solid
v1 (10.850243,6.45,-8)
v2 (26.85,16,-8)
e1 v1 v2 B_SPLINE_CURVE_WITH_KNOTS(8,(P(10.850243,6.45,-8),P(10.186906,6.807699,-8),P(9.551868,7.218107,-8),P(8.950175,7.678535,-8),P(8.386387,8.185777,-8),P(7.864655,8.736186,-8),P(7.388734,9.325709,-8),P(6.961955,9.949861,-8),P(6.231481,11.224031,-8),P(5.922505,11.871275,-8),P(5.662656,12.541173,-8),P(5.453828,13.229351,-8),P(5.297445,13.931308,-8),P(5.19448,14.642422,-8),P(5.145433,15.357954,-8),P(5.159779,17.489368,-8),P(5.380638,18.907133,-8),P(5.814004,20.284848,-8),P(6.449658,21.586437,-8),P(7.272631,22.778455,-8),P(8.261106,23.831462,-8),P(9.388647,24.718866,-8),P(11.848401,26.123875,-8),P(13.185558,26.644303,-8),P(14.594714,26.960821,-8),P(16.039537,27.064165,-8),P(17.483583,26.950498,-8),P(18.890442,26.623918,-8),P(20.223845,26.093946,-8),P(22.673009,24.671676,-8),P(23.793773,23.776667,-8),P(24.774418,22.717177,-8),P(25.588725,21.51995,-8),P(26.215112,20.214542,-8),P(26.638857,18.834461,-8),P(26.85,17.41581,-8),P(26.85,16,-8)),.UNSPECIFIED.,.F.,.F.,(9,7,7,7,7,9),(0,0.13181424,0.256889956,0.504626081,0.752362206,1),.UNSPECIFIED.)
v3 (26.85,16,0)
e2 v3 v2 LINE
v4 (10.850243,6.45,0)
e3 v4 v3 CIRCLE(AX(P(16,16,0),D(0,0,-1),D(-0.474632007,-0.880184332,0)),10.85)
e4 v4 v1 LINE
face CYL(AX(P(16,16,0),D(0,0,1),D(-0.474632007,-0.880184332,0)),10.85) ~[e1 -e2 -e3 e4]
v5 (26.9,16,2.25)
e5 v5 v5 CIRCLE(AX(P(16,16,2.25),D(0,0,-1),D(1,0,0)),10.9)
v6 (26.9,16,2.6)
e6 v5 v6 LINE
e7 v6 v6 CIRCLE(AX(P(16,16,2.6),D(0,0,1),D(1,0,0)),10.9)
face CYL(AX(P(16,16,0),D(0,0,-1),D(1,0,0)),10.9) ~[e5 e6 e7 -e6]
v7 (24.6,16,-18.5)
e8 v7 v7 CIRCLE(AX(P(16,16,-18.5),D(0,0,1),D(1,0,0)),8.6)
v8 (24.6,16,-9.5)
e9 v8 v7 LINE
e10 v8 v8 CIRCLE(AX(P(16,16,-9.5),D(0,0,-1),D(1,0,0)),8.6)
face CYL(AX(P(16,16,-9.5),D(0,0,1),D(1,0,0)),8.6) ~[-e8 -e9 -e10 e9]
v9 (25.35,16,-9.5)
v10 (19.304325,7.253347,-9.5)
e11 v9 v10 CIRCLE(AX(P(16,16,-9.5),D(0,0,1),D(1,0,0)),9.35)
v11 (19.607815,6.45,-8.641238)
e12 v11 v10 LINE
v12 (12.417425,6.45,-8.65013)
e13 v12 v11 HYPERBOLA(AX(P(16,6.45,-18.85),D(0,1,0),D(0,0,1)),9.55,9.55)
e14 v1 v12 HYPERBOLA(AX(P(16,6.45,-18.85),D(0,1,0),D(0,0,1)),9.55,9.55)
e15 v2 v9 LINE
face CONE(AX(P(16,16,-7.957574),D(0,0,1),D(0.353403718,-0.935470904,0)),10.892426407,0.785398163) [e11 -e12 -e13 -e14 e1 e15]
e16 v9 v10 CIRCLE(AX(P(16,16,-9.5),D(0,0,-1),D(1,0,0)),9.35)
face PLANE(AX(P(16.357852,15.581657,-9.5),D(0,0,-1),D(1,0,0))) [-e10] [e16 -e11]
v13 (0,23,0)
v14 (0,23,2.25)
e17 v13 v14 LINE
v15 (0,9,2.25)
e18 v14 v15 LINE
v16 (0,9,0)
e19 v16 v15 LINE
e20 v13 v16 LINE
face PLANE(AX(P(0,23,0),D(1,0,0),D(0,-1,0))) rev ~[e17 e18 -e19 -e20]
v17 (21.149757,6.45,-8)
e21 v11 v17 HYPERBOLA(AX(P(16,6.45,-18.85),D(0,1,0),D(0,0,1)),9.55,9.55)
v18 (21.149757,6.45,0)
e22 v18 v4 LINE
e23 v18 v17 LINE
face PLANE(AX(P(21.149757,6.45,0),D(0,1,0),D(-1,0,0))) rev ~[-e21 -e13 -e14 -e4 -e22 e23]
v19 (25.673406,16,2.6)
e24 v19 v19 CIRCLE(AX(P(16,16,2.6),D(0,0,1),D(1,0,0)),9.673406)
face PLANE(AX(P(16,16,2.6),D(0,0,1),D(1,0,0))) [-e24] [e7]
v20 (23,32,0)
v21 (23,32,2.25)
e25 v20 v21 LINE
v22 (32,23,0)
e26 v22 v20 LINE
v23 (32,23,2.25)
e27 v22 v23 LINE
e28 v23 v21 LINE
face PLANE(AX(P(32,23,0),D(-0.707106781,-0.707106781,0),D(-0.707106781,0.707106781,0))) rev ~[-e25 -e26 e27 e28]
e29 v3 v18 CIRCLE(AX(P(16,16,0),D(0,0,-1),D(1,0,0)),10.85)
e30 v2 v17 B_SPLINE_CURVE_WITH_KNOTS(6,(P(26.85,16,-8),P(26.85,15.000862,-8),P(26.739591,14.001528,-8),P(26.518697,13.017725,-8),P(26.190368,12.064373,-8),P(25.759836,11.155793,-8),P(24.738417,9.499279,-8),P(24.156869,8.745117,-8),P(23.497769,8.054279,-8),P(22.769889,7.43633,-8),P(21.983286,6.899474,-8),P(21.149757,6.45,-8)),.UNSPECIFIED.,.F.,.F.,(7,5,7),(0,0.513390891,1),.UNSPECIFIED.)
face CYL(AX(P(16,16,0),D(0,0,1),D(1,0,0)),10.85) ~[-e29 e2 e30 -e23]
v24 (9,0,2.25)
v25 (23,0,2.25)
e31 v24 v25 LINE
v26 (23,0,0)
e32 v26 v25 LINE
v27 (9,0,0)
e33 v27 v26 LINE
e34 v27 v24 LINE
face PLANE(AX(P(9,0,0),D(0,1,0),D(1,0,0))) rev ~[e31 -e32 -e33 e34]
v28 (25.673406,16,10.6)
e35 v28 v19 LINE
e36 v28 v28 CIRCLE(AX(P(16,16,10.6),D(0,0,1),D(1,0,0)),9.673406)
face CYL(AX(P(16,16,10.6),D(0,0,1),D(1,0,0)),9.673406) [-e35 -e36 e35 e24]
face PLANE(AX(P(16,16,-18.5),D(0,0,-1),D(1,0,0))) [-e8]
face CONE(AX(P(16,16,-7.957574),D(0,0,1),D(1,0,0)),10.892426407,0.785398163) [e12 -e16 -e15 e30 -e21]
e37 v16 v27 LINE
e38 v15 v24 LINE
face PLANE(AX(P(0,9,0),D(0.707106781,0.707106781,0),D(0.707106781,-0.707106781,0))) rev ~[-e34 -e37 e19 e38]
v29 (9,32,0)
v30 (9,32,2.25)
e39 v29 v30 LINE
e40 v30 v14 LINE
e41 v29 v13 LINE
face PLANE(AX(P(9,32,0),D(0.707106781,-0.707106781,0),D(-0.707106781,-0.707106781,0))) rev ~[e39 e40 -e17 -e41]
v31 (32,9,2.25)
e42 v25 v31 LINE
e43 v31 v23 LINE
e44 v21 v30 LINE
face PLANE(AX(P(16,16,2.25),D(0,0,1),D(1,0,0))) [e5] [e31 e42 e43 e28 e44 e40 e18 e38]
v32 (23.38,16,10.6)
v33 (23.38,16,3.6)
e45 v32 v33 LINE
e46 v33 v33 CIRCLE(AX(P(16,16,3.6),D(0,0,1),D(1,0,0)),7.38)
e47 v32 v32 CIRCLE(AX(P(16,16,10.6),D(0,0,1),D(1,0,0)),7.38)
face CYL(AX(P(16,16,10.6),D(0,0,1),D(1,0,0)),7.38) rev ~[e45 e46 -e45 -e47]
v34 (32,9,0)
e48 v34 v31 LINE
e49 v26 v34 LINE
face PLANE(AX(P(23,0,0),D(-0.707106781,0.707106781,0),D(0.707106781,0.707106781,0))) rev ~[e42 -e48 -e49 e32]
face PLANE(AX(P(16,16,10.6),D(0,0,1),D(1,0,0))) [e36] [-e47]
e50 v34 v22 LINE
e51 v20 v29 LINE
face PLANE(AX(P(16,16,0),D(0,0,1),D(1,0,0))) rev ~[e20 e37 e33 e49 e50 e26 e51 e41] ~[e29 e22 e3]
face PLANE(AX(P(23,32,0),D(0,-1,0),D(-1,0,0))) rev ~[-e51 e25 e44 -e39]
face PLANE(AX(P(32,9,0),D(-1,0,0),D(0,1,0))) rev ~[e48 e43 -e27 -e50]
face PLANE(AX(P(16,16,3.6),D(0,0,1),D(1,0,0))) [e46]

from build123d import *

# Parameters (mm, degrees)
F1_DEPTH    = 2.25
F2_R        = 10.9
F3_DEPTH    = 10.6
F5_DEPTH    = 9.5
F6_T2_ANGLE = 290.6956436441
F6_T4_ANGLE = 110.5630137602
F7_R        = 8.6
F8_DEPTH    = 10
F9_R        = 7.38
F10_DEPTH   = 7
F11_R       = 10.9
F11_R_2     = 9.6734059383
F12_DEPTH   = 8
F13_R       = 9.5
F14_DEPTH   = 1


# Not quite as in the source:
# - a fillet or chamfer that OpenCascade refuses, or shapes differently, is made with other operations: its cross-section is extruded or revolved along the edge and cut away or added


with BuildPart() as f1:
    # F0 (on Top) → F1 (new body)
    with BuildSketch(Plane.XY):
        Polygon((0, 9), (9, 0), (23, 0), (32, 9), (32, 23), (23, 32), (9, 32), (0, 23), align=None)
    extrude(amount=F1_DEPTH)

    # F2 (on Top) → F3 (join)
    with BuildSketch(Plane.XY):
        with Locations((16, 16)):
            Circle(F2_R)
    extrude(amount=F3_DEPTH)

    # F4 (on face) → F5 (join)
    with BuildSketch(Plane(origin=(0, 0, 0), x_dir=(1, 0, 0), z_dir=(0, 0, -1))):
        with BuildLine():
            ThreePointArc((10.8502427242, -6.45), (10.4390813008, -25.3165810908), (26.85, -16))
            ThreePointArc((26.85, -16), (25.3165810908, -10.4390813008), (21.1497572758, -6.45))
            Line((21.1497572758, -6.45), (10.8502427242, -6.45))
        make_face()
    extrude(amount=F5_DEPTH)

    # F6: chamfer of 1.5 on 2 edges, made by hand

    # F6_s1 → F6_t2 (revolve, cut)
    with BuildSketch(Plane(origin=(19.2912753227, 7.2878893438, 0), x_dir=(0, 0, 1), z_dir=(0.9354709038, 0.3534037184, 0))):
        with BuildLine():
            Line((-7.9575735931, 1.5793514401), (-9.5424264069, -0.0055013736))
            Line((-9.5424264069, -0.0055013736), (-9.5724264069, -0.0055013736))
            ThreePointArc((-9.5724264069, -0.0055013736), (-9.53, 0.7657118298), (-9.53, 1.5369250333))
            Line((-9.53, 1.5369250333), (-9.5, 1.5669250333))
            ThreePointArc((-9.5, 1.5669250333), (-8.7287867966, 1.5669250333), (-7.9575735931, 1.6093514401))
            Line((-7.9575735931, 1.6093514401), (-7.9575735931, 1.5793514401))
        make_face()
    revolve(axis=Axis((16, 16, -9.5), (0, 0, -1)), revolution_arc=F6_T2_ANGLE, mode=Mode.SUBTRACT)

    # F6_s3 → F6_t4 (revolve, cut)
    with BuildSketch(Plane.XZ.offset(-16)):
        with BuildLine():
            Line((26.8924264069, -7.9575735931), (25.3075735931, -9.5424264069))
            Line((25.3075735931, -9.5424264069), (25.3075735931, -9.5724264069))
            ThreePointArc((25.3075735931, -9.5724264069), (26.0787867966, -9.53), (26.85, -9.53))
            Line((26.85, -9.53), (26.88, -9.5))
            ThreePointArc((26.88, -9.5), (26.88, -8.7287867966), (26.9224264069, -7.9575735931))
            Line((26.9224264069, -7.9575735931), (26.8924264069, -7.9575735931))
        make_face()
    revolve(axis=Axis((16, 16, -9.5), (0, 0, -1)), revolution_arc=F6_T4_ANGLE, mode=Mode.SUBTRACT)

    # F7 (on face) → F8 (join)
    with BuildSketch(Plane(origin=(0, 0, -9.5), x_dir=(1, 0, 0), z_dir=(0, 0, -1))):
        with Locations((16, -16)):
            Circle(F7_R)
    extrude(amount=F8_DEPTH)

    # F9 (on face) → F10 (cut)
    with BuildSketch(Plane.XY.offset(10.6)):
        with Locations((16, 16)):
            Circle(F9_R)
    extrude(amount=-F10_DEPTH, mode=Mode.SUBTRACT)

    # F11 (on face) → F12 (cut)
    with BuildSketch(Plane.XY.offset(10.6)):
        with Locations((16, 16)):
            Circle(F11_R)
        with Locations((16, 16)):
            Circle(F11_R_2, mode=Mode.SUBTRACT)
    extrude(amount=-F12_DEPTH, mode=Mode.SUBTRACT)

    # F13 (on face) → F14 (cut)
    with BuildSketch(Plane(origin=(0, 0, -19.5), x_dir=(1, 0, 0), z_dir=(0, 0, -1))):
        with Locations((16, -16)):
            Circle(F13_R)
    extrude(amount=-F14_DEPTH, mode=Mode.SUBTRACT)


solid = f1.part
